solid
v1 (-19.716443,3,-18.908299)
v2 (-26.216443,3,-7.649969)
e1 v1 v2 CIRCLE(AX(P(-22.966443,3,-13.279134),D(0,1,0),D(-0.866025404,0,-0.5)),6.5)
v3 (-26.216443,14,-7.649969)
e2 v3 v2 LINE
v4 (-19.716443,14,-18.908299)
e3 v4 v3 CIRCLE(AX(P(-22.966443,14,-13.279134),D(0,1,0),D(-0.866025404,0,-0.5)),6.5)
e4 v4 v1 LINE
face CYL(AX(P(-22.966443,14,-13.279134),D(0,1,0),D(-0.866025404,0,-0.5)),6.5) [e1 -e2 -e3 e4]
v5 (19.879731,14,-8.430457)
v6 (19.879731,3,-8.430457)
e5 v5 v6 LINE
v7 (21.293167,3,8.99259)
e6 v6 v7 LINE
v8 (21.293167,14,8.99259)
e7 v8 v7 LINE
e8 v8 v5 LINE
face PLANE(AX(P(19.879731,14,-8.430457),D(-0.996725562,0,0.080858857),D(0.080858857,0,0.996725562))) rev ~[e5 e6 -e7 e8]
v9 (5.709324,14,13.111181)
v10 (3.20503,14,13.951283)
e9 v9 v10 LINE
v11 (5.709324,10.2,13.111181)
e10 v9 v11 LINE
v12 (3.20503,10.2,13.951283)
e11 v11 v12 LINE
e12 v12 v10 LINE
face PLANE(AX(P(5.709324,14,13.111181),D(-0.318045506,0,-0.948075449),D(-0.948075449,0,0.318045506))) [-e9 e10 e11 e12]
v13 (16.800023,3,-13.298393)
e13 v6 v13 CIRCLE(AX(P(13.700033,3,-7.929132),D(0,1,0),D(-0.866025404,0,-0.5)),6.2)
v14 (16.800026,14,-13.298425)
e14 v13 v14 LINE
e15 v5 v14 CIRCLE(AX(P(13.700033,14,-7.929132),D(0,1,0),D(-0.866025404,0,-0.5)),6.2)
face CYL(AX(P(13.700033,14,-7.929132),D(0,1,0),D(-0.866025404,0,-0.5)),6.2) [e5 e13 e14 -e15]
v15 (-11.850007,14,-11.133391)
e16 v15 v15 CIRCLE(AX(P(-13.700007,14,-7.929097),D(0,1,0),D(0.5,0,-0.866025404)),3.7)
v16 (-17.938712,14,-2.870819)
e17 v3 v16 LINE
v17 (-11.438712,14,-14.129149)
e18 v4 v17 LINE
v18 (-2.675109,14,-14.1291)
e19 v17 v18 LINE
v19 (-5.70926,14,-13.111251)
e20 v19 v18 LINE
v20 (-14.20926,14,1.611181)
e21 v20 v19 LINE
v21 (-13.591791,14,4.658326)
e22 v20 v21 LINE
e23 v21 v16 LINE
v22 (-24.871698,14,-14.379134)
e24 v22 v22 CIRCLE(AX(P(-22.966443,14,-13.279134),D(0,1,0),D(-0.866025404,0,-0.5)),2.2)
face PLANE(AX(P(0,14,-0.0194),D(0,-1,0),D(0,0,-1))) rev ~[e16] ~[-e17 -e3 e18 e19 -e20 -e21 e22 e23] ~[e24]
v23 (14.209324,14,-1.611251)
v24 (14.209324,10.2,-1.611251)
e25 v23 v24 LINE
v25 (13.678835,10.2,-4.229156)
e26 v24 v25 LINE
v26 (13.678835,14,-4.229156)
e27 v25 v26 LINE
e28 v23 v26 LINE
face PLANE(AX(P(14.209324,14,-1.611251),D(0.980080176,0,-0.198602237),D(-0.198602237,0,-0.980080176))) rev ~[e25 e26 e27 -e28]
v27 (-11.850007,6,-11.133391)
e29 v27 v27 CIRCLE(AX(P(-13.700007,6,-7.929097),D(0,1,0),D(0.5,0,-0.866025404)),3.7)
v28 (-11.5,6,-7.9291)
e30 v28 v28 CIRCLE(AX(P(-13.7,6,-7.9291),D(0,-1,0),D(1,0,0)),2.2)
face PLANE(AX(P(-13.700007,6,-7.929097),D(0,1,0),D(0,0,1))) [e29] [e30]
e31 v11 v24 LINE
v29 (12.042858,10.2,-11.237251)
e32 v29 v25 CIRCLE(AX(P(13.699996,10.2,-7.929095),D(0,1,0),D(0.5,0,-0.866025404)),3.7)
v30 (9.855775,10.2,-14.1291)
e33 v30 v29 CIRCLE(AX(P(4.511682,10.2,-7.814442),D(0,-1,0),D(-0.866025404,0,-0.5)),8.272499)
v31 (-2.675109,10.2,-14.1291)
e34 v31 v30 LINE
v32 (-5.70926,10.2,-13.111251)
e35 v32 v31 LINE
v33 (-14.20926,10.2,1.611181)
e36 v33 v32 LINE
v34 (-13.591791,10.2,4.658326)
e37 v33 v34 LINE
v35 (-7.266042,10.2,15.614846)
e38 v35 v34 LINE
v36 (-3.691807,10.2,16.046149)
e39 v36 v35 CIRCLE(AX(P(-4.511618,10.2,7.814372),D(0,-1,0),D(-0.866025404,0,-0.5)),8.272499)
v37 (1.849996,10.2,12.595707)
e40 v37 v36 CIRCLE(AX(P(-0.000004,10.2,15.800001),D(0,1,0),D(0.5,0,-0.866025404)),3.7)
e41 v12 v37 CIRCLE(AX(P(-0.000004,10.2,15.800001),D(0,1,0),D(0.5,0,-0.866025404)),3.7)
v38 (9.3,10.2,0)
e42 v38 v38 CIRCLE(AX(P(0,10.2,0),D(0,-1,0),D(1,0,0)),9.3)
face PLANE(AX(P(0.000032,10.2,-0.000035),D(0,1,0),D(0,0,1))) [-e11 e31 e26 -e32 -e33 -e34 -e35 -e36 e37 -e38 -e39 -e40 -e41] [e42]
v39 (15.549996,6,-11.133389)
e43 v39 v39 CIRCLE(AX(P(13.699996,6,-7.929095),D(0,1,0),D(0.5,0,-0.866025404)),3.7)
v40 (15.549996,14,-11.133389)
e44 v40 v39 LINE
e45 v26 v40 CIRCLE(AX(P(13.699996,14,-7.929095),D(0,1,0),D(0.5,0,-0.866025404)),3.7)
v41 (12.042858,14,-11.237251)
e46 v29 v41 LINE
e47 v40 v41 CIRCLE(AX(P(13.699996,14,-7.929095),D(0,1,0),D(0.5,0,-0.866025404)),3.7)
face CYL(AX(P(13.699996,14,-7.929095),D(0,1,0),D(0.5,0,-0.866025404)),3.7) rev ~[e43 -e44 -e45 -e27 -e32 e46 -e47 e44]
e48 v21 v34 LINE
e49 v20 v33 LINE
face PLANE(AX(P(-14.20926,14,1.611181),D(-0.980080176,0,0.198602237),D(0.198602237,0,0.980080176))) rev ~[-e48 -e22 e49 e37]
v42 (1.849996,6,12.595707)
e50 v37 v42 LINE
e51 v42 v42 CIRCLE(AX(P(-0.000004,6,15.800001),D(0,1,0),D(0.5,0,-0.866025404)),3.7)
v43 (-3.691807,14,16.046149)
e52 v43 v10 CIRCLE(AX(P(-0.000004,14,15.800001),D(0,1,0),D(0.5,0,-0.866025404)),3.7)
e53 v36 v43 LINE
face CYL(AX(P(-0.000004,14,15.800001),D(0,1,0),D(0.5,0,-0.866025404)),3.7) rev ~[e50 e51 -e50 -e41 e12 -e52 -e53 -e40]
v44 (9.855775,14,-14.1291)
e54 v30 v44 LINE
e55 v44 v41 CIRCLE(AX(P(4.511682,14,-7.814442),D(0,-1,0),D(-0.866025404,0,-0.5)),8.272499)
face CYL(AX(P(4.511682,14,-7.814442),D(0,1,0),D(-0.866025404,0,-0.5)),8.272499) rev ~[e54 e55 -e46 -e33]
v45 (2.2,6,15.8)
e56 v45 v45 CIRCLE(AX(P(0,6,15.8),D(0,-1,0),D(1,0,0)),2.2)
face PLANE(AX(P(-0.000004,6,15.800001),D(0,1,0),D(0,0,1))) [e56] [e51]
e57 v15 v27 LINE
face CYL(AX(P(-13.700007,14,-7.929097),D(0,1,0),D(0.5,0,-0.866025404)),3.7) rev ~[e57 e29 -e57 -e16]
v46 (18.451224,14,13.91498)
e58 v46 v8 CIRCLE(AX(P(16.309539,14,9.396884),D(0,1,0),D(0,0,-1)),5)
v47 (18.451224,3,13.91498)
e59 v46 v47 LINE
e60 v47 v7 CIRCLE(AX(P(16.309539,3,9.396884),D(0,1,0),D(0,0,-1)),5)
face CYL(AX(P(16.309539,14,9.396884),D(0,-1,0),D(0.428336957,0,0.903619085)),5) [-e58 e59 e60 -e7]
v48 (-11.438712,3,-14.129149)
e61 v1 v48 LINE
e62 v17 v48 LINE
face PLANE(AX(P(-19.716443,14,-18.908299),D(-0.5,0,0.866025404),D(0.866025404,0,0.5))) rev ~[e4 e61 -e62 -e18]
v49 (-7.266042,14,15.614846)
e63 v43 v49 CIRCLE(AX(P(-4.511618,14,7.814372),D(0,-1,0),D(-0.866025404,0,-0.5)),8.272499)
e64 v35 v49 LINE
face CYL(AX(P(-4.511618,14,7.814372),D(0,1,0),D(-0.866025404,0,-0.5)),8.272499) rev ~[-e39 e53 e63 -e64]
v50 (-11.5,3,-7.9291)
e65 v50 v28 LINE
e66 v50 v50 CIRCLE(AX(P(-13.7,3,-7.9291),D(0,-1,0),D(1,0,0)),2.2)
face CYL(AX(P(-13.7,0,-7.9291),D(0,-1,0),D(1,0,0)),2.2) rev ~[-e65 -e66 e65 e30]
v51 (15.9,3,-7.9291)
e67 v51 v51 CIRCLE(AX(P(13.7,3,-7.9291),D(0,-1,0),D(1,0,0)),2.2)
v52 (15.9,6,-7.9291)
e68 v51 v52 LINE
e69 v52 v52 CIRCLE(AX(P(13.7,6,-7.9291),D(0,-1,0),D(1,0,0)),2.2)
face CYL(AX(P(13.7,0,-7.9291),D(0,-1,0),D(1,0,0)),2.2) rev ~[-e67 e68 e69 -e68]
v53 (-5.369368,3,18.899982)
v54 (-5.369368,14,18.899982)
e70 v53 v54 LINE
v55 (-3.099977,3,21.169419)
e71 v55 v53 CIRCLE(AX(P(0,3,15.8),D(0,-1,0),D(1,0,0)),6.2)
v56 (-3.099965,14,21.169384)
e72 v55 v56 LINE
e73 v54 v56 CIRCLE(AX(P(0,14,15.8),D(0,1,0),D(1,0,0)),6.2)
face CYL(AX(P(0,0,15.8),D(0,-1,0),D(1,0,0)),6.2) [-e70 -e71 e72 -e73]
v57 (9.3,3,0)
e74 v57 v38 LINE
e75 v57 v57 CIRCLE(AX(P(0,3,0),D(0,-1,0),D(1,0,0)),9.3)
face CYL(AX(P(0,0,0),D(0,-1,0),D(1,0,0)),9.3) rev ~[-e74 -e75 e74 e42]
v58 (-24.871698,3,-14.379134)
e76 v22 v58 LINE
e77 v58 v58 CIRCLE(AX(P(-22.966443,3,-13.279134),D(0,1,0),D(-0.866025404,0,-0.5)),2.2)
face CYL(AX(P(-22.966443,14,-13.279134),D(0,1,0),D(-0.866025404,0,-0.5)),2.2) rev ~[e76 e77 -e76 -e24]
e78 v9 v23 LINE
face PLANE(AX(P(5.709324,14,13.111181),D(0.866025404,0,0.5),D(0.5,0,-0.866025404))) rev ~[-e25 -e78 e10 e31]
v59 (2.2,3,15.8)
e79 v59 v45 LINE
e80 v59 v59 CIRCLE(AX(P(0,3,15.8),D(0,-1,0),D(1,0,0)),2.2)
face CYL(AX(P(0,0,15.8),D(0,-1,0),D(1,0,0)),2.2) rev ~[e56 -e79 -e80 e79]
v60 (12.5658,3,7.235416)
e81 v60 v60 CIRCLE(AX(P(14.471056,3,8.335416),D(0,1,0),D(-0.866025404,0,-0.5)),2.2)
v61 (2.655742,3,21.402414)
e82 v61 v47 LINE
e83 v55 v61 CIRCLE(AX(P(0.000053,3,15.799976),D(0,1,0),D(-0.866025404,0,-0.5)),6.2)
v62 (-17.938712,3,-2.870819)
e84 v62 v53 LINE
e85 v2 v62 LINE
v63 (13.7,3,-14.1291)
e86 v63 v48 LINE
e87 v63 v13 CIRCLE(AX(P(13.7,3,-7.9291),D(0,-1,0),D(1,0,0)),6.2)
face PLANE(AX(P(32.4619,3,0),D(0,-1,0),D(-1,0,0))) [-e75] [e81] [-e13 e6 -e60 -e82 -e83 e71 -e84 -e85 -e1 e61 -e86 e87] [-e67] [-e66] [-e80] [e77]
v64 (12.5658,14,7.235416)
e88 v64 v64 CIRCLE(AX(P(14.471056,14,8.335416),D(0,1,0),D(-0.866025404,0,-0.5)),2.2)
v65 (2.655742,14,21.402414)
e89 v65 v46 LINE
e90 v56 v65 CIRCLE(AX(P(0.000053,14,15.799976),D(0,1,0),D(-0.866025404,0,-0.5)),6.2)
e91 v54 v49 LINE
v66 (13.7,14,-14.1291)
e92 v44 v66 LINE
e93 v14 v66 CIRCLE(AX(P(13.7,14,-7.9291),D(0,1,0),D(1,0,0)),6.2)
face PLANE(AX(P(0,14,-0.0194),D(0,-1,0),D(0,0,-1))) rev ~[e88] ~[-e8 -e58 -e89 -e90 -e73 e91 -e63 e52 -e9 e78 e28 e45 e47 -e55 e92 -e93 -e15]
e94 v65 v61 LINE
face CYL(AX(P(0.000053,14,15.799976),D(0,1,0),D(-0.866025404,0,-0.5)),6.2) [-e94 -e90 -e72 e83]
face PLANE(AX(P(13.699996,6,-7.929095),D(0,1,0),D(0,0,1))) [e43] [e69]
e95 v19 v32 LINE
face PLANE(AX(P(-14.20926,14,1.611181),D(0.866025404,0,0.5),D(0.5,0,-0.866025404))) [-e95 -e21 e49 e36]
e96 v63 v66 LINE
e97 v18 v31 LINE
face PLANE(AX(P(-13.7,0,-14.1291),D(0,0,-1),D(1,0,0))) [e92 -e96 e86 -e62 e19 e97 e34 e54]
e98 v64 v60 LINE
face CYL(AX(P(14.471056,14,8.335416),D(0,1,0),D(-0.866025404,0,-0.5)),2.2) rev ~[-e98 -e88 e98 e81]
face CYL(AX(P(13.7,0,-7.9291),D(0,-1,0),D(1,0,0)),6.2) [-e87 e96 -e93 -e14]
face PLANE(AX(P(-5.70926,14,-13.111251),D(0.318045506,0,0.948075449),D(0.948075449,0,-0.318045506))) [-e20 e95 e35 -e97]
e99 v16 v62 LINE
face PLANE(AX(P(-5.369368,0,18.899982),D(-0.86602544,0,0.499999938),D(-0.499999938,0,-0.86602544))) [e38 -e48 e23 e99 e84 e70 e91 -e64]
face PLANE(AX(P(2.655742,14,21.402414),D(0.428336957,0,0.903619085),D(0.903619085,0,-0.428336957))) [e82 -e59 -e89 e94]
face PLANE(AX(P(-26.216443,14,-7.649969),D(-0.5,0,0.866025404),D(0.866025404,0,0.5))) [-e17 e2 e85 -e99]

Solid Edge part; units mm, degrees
sketch "Sketch1" plane through (0, 0, 0) normal (0, -1, 0) x (1, 0, 0)
  line L0 (-5.3694, 18.9) -> (-19.0694, -4.8291)
  arc A0 (-13.7, -14.1291) -> (-19.0694, -4.8291) centre (-13.7, -7.9291) cw
  line L1 (-13.7, -14.1291) -> (13.7, -14.1291)
  arc A1 (19.0694, -4.8291) -> (13.7, -14.1291) centre (13.7, -7.9291) cw
  line L2 (5.3694, 18.9) -> (19.0694, -4.8291)
  arc A2 (-5.3694, 18.9) -> (5.3694, 18.9) centre (0, 15.8) cw
  dimension "D1" = 5.3694
extrude "Protrusion1" add sketch "Sketch1" against normal blind 14
sketch "Sketch2" plane through (0, 0, 0) normal (0, -1, 0) x (1, 0, 0)
  circle A0 centre (-13.7, -7.9291) radius 2.2
  circle A1 centre (13.7, -7.9291) radius 2.2
  circle A2 centre (0, 15.8) radius 2.2
  dimension "D1" = 37.2
  dimension "D2" = 4
  dimension "D3" = 4.4
  dimension "D4" = 6.2
  dimension "D5" = 6.2
  dimension "D6" = 4.4
  dimension "D7" = 6.2
  dimension "D8" = 27.4
  dimension "D9" = 27.4
  dimension "D10" = 27.4
extrude "Cutout1" cut sketch "Sketch2" against normal blind 457.8755
sketch "Sketch3" plane through (0, 0, 0) normal (0, -1, 0) x (1, 0, 0)
  circle A0 centre (0, 0) radius 9.3
extrude "Cutout2" cut sketch "Sketch3" against normal blind 434.4917
sketch "Sketch4" plane through (0, 0, 3.9355) normal (0, -1, 0) x (-0.5, 0, 0.8660254)
  line L0 (-23.325, -5.9323) -> (-23.325, -18.9323)
  line L1 (-23.325, -18.9323) -> (16.475, -18.9323)
  line L2 (16.475, -18.9323) -> (16.475, -5.9323)
  line L3 (12.7755, -8.7037) -> (16.475, -5.9323)
  line L4 (-20.9306, -8.7037) -> (12.7755, -8.7037)
  line L5 (-20.9306, -5.9323) -> (-20.9306, -8.7037)
  line L6 (-23.325, -5.9323) -> (-20.9306, -5.9323)
  dimension "D1" = 13
extrude "Protrusion2" add sketch "Sketch4" against normal up to vertex (14 mm away)
sketch "Sketch5" plane through (18.1083, 8, 10.4355) normal (0.8660254, 0, 0.5) x (-0.5, 0, 0.8660254)
  line L0 (-19.9, 8) -> (19.9, 8)
  line L1 (19.9, -6) -> (19.9, 8)
  line L2 (-19.9, -6) -> (19.9, -6)
  line L3 (-19.9, -6) -> (-19.9, 8)
extrude "ExtrudedProtrusion_14" add sketch "Sketch5" along normal blind 4
sketch "Sketch6" plane through (5.8112, 14, 7.7701) normal (0, 1, 0) x (0.5, 0, -0.8660254)
  circle A0 centre (3.8403, 24.7468) radius 3.7
  circle A1 centre (17.5403, 1.0177) radius 3.7
  circle A2 centre (-9.8597, 1.0177) radius 3.7
extrude "Cutout3" cut sketch "Sketch6" against normal blind 8
sketch "Sketch7" plane through (11.8615, 14, 7.7701) normal (0, 1, 0) x (-0.8660254, 0, -0.5)
  circle A0 centre (-2.5426, -0.8152) radius 2.2
  dimension "D1" = 6
  dimension "D2" = 39.8
  dimension "D3" = 19.9
  dimension "D4" = 4.4
extrude "ExtrudedCutout_23" cut sketch "Sketch7" against normal blind 166.5817
sketch "Sketch8" plane through (11.8615, 14, 7.7701) normal (0, 1, 0) x (-0.8660254, 0, -0.5)
  circle A0 centre (40.6865, -0.8152) radius 2.2
  line L0 (40.6865, 5.6848) -> (31.1282, 5.6848)
  line L1 (31.1282, 5.6848) -> (31.1282, 3.8832)
  line L2 (31.1282, 3.8832) -> (34.2429, 1.8592)
  line L3 (34.2429, 1.8592) -> (34.2429, -2.6486)
  line L4 (31.1282, -7.3152) -> (34.2429, -2.6486)
  line L5 (40.6865, -7.3152) -> (31.1282, -7.3152)
  arc A1 (40.6865, -7.3152) -> (40.6865, 5.6848) centre (40.6865, -0.8152) ccw
extrude "Protrusion3" add sketch "Sketch8" against normal up to vertex (14 mm away)
sketch "Sketch9" plane through (11.8615, 14, 7.7701) normal (0, 1, 0) x (-0.8660254, 0, -0.5)
  line L0 (-10.7426, -0.8152) -> (-10.7426, -20.7152)
  line L1 (-10.7426, -20.7152) -> (6.2574, -20.7152)
  arc A0 (1.1563, -18.0392) -> (6.2574, -20.7152) centre (6.2574, -14.5152) ccw
  line L2 (1.1563, -18.0392) -> (-10.7426, -0.8152)
extrude "Cutout4" cut sketch "Sketch9" against normal blind 85.4791
sketch "Sketch10" plane through (6.8865, 14, 7.7701) normal (0, 1, 0) x (-0.8660254, 0, -0.5)
  line L0 (-15.0511, 16.5973) -> (-15.0511, -3.3027)
  line L1 (-3.1522, 13.9213) -> (-15.0511, -3.3027)
  arc A0 (1.9489, 16.5973) -> (-3.1522, 13.9213) centre (1.9489, 10.3973) ccw
  line L2 (1.9489, 16.5973) -> (-15.0511, 16.5973)
extrude "ExtrudedCutout_27" cut sketch "Sketch10" against normal blind 118.3722
sketch "Sketch11" plane through (0, 0, 0) normal (0, 0, 1) x (1, 0, 0)
  line L0 (-57, 0) -> (32.4619, 0)
  line L1 (32.4619, 0) -> (32.4619, 3)
  line L2 (32.4619, 3) -> (-57, 3)
  line L3 (-57, 3) -> (-57, 0)
  dimension "D1" = 3
extrude "Cutout5" cut sketch "Sketch11" along normal mid plane 82.8276
sketch "Sketch12" plane through (11.8615, 14, 7.7701) normal (0, 1, 0) x (-0.8660254, 0, -0.5)
  line L0 (2.6574, 7.7016) -> (2.6574, -9.2984)
  line L1 (2.6574, -9.2984) -> (7.9574, -15.2984)
  arc A0 (20.3574, -15.2984) -> (7.9574, -15.2984) centre (14.1574, -9.8217) cw
  line L2 (25.6574, -9.2984) -> (20.3574, -15.2984)
  line L3 (25.6574, 7.7016) -> (25.6574, -9.2984)
  line L4 (25.6574, 7.7016) -> (20.3574, 13.7016)
  arc A1 (7.9574, 13.7016) -> (20.3574, 13.7016) centre (14.1574, 8.2249) cw
  line L5 (2.6574, 7.7016) -> (7.9574, 13.7016)
  dimension "D1" = 11.5
  dimension "D2" = 11.5
  dimension "D3" = 6.2
  dimension "D4" = 6.2
  dimension "D5" = 8.5
  dimension "D6" = 8.5
  dimension "D7" = 8.5
  dimension "D8" = 8.5
  dimension "D9" = 6
  dimension "D10" = 6
  dimension "D11" = 6
  dimension "D12" = 6
extrude "Cutout6" cut sketch "Sketch12" against normal blind 3.8
fillet "Round_2" radius 5 1 edges at (21.5724, 8.5, 12.4355)
